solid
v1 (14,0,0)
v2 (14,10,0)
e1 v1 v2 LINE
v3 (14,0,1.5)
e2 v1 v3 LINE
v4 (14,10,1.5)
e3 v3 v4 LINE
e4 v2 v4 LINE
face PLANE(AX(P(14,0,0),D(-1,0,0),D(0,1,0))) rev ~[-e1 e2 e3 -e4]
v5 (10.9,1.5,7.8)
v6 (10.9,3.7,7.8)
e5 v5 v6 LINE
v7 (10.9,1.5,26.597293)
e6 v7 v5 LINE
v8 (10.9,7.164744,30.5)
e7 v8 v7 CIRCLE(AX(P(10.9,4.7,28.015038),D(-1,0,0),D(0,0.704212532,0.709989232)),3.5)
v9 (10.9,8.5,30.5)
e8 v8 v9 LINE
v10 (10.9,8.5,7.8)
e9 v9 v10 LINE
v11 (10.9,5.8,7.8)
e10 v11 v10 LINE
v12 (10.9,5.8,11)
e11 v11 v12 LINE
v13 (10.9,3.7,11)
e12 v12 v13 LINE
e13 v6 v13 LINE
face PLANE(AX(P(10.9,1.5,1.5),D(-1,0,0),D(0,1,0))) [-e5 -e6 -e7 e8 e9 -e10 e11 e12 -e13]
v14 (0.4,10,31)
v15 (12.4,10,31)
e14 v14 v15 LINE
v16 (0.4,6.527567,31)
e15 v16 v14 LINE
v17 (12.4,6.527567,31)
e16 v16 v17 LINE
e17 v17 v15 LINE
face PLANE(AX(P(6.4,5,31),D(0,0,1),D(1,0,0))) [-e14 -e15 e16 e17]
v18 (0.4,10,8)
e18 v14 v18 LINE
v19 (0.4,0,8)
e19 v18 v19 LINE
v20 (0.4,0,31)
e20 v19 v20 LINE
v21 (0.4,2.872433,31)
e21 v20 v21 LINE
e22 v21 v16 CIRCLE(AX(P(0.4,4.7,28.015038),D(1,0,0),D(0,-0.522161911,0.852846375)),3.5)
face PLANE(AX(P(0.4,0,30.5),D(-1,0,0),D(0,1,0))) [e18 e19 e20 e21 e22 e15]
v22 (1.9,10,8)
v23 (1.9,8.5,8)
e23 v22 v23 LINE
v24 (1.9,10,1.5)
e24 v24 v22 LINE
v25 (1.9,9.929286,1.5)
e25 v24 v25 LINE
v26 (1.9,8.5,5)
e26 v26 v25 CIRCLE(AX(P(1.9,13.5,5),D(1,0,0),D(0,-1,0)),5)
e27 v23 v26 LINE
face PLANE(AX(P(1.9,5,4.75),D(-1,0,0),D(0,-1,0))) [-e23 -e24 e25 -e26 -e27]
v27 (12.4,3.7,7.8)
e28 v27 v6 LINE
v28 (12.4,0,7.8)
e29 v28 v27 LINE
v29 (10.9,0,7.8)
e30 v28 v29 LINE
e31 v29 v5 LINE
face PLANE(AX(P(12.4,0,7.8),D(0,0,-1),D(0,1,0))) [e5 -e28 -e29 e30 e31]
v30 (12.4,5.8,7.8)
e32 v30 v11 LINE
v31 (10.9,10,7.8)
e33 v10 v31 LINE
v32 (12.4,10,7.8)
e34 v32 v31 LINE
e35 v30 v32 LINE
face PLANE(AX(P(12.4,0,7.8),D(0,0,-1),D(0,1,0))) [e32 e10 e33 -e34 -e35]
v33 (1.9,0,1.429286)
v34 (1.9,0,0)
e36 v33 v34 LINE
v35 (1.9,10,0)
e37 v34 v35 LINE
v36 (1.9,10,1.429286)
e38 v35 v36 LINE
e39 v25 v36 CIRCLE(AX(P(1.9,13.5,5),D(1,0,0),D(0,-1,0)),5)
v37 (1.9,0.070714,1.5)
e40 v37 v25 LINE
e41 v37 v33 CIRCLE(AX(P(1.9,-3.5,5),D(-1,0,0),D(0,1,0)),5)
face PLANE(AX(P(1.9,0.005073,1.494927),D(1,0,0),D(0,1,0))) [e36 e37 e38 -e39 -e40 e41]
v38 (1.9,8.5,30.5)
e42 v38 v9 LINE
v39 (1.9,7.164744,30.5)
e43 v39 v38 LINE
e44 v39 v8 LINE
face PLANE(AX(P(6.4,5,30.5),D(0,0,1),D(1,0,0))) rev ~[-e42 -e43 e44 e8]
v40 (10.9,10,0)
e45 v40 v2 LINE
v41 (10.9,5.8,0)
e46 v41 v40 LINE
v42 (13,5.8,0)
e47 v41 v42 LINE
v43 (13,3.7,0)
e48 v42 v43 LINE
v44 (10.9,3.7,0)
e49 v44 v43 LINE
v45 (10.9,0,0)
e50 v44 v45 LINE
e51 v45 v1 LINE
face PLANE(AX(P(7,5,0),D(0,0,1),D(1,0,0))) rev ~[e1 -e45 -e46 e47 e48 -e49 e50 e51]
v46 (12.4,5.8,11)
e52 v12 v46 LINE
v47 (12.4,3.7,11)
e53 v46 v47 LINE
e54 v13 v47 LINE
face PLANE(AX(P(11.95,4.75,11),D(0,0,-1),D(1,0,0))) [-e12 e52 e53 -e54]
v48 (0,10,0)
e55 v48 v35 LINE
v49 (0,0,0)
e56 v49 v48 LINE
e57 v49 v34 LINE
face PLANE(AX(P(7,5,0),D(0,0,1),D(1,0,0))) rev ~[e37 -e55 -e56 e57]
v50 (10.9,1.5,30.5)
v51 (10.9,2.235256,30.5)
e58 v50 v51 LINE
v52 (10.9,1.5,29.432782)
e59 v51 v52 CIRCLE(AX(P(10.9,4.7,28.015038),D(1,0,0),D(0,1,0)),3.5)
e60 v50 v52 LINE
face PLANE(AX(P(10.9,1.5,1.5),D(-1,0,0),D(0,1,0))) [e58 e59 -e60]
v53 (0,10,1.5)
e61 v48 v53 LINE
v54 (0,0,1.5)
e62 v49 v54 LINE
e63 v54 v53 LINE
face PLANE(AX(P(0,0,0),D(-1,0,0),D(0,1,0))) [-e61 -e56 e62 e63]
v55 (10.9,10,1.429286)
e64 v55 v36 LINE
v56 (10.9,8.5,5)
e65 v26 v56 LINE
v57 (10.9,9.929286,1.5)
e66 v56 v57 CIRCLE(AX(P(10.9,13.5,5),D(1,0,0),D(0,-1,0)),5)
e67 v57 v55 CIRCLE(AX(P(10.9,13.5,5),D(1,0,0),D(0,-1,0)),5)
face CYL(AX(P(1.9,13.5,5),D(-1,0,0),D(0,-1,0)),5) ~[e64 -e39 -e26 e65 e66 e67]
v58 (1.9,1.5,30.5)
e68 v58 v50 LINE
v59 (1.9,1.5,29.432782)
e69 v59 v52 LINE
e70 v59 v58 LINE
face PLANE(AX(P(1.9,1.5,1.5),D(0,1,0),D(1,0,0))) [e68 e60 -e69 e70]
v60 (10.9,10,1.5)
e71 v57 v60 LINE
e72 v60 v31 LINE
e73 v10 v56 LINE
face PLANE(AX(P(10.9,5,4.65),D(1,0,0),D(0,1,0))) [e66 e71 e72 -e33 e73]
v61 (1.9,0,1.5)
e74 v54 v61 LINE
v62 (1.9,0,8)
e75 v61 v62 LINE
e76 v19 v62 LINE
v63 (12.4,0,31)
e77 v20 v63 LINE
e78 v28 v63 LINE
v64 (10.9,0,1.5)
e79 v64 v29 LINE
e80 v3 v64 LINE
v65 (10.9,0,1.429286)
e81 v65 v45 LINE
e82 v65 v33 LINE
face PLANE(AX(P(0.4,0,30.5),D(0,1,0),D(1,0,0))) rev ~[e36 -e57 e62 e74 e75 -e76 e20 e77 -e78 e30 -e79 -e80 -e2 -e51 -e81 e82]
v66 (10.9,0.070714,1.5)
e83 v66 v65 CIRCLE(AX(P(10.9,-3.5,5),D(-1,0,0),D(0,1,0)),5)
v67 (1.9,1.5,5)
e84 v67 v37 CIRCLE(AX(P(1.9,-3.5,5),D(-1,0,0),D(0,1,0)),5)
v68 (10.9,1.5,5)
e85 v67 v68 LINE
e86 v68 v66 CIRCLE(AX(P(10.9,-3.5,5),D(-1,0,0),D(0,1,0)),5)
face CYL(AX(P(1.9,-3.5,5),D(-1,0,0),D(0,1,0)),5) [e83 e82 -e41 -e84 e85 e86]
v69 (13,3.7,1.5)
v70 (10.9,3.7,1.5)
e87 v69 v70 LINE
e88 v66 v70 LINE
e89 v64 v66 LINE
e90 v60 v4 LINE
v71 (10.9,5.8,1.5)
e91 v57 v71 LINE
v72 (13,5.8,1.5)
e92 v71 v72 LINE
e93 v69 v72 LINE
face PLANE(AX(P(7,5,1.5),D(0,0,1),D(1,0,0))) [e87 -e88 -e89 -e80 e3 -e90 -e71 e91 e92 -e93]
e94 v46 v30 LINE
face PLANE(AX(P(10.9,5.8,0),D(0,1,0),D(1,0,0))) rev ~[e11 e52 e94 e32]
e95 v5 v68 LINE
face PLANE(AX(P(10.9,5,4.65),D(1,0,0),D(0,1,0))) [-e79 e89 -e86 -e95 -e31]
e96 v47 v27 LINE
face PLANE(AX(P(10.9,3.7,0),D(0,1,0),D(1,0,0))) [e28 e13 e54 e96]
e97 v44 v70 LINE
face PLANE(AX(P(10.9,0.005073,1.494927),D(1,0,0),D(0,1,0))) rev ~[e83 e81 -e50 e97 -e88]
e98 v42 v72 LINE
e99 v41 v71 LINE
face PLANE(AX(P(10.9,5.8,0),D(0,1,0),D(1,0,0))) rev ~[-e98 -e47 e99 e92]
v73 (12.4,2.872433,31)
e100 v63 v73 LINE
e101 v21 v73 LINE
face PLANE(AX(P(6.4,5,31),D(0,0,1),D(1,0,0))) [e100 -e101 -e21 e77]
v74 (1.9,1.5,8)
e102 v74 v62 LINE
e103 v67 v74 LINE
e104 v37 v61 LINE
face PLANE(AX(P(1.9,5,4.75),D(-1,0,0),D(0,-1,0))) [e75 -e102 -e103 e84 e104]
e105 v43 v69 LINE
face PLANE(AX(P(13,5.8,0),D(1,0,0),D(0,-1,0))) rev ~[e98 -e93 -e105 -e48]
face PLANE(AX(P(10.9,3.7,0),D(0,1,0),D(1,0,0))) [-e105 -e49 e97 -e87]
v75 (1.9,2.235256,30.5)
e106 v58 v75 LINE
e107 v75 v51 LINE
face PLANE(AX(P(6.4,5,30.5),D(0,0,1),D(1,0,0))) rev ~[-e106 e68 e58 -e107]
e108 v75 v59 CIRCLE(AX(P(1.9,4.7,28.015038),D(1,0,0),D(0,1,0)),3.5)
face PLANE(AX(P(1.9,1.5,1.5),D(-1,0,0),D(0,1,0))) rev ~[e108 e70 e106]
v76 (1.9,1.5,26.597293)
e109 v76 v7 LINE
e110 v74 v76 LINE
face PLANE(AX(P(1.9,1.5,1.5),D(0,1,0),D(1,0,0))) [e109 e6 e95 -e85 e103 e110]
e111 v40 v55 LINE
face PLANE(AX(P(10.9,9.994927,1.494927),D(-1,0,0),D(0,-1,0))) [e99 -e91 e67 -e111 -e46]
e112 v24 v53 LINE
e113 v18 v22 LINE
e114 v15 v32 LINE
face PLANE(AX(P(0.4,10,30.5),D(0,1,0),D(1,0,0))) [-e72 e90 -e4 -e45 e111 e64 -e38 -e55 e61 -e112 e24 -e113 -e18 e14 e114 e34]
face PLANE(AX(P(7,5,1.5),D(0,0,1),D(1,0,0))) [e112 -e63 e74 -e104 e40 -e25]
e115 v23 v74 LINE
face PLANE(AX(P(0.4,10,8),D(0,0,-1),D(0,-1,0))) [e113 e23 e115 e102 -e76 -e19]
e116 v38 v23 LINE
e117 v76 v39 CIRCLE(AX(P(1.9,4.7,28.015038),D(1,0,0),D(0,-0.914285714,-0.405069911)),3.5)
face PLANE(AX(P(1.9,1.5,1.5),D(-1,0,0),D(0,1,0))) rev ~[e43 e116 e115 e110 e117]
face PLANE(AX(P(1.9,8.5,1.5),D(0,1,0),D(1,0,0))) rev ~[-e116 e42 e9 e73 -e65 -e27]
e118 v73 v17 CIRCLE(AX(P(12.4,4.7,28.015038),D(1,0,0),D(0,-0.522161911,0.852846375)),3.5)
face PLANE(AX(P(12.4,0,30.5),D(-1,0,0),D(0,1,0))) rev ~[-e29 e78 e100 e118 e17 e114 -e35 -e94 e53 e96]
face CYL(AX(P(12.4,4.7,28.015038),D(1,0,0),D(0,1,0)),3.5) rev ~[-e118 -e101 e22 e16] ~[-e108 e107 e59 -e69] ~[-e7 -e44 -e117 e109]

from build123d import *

# Parameters (mm, degrees)
F0_W         = 14
F0_H         = 10
F1_DEPTH     = 1.5
F2_W         = 9
F2_H         = 7
F3_DEPTH     = 25
F4_W         = 12
F4_H         = 10
F4_W_2       = 9
F4_H_2       = 7
F5_DEPTH     = 29
F6_W         = 12
F6_H         = 10
F7_DEPTH     = 0.5
F8_R         = 3.5
F9_DEPTH     = 25
F10_W        = 2.1
F10_H        = 2.1
F11_DEPTH    = 11
F12_W        = 10
F12_H        = 6.5
F13_DEPTH    = 1.5
F14_W        = 10
F14_H        = 6.3
F15_DEPTH    = 1.5
F16_T1_DEPTH = 9


# Not quite as in the source:
# - a fillet or chamfer that OpenCascade refuses, or shapes differently, is made with other operations: its cross-section is extruded or revolved along the edge and cut away or added


with BuildPart() as f1:
    # F0 (on Top) → F1 (new body)
    with BuildSketch(Plane.XY):
        with Locations((7, 5)):
            Rectangle(F0_W, F0_H)
    extrude(amount=F1_DEPTH)

    # F2 (on face) → F3 (cut)
    with BuildSketch(Plane.XY.offset(1.5)):
        with Locations((6.4, 5)):
            Rectangle(F2_W, F2_H)
    extrude(amount=-F3_DEPTH, mode=Mode.SUBTRACT)

    # F4 (on face) → F5 (join)
    with BuildSketch(Plane.XY.offset(1.5)):
        with Locations((6.4, 5)):
            Rectangle(F4_W, F4_H)
        with Locations((6.4, 5)):
            Rectangle(F4_W_2, F4_H_2, mode=Mode.SUBTRACT)
    extrude(amount=F5_DEPTH)

    # F6 (on face) → F7 (join)
    with BuildSketch(Plane.XY.offset(30.5)):
        with Locations((6.4, 5)):
            Rectangle(F6_W, F6_H)
    extrude(amount=F7_DEPTH)

    # F8 (on face) → F9 (cut)
    with BuildSketch(Plane.YZ.offset(12.4)):
        with Locations((4.7, 28.0150376887)):
            Circle(F8_R)
    extrude(amount=-F9_DEPTH, mode=Mode.SUBTRACT)

    # F10 (on face) → F11 (cut)
    with BuildSketch(Plane(origin=(0, 0, 0), x_dir=(1, 0, 0), z_dir=(0, 0, -1))):
        with Locations((11.95, -4.75)):
            Rectangle(F10_W, F10_H)
    extrude(amount=-F11_DEPTH, mode=Mode.SUBTRACT)

    # F12 (on face) → F13 (cut)
    with BuildSketch(Plane(origin=(0.4, 0, 0), x_dir=(0, -1, 0), z_dir=(-1, 0, 0))):
        with Locations((-5, 4.75)):
            Rectangle(F12_W, F12_H)
    extrude(amount=-F13_DEPTH, mode=Mode.SUBTRACT)

    # F14 (on face) → F15 (cut)
    with BuildSketch(Plane.YZ.offset(12.4)):
        with Locations((5, 4.65)):
            Rectangle(F14_W, F14_H)
    extrude(amount=-F15_DEPTH, mode=Mode.SUBTRACT)

    # F16: fillet of radius 5 on 2 edges, made by hand

    # F16_s2 → F16_t1 (cut)
    with BuildSketch(Plane.YZ.offset(1.9)):
        with BuildLine():
            ThreePointArc((8.5, 5), (9.9644660941, 1.4644660941), (13.5, 0))
            Line((13.5, 0), (13.5, -0.1))
            Line((13.5, -0.1), (8.4, -0.1))
            Line((8.4, -0.1), (8.4, 5))
            Line((8.4, 5), (8.5, 5))
        make_face()
        with BuildLine():
            ThreePointArc((1.5, 5), (0.0355339059, 1.4644660941), (-3.5, 0))
            Line((-3.5, 0), (-3.5, -0.1))
            Line((-3.5, -0.1), (1.6, -0.1))
            Line((1.6, -0.1), (1.6, 5))
            Line((1.6, 5), (1.5, 5))
        make_face()
    extrude(amount=F16_T1_DEPTH, mode=Mode.SUBTRACT)


solid = f1.part
